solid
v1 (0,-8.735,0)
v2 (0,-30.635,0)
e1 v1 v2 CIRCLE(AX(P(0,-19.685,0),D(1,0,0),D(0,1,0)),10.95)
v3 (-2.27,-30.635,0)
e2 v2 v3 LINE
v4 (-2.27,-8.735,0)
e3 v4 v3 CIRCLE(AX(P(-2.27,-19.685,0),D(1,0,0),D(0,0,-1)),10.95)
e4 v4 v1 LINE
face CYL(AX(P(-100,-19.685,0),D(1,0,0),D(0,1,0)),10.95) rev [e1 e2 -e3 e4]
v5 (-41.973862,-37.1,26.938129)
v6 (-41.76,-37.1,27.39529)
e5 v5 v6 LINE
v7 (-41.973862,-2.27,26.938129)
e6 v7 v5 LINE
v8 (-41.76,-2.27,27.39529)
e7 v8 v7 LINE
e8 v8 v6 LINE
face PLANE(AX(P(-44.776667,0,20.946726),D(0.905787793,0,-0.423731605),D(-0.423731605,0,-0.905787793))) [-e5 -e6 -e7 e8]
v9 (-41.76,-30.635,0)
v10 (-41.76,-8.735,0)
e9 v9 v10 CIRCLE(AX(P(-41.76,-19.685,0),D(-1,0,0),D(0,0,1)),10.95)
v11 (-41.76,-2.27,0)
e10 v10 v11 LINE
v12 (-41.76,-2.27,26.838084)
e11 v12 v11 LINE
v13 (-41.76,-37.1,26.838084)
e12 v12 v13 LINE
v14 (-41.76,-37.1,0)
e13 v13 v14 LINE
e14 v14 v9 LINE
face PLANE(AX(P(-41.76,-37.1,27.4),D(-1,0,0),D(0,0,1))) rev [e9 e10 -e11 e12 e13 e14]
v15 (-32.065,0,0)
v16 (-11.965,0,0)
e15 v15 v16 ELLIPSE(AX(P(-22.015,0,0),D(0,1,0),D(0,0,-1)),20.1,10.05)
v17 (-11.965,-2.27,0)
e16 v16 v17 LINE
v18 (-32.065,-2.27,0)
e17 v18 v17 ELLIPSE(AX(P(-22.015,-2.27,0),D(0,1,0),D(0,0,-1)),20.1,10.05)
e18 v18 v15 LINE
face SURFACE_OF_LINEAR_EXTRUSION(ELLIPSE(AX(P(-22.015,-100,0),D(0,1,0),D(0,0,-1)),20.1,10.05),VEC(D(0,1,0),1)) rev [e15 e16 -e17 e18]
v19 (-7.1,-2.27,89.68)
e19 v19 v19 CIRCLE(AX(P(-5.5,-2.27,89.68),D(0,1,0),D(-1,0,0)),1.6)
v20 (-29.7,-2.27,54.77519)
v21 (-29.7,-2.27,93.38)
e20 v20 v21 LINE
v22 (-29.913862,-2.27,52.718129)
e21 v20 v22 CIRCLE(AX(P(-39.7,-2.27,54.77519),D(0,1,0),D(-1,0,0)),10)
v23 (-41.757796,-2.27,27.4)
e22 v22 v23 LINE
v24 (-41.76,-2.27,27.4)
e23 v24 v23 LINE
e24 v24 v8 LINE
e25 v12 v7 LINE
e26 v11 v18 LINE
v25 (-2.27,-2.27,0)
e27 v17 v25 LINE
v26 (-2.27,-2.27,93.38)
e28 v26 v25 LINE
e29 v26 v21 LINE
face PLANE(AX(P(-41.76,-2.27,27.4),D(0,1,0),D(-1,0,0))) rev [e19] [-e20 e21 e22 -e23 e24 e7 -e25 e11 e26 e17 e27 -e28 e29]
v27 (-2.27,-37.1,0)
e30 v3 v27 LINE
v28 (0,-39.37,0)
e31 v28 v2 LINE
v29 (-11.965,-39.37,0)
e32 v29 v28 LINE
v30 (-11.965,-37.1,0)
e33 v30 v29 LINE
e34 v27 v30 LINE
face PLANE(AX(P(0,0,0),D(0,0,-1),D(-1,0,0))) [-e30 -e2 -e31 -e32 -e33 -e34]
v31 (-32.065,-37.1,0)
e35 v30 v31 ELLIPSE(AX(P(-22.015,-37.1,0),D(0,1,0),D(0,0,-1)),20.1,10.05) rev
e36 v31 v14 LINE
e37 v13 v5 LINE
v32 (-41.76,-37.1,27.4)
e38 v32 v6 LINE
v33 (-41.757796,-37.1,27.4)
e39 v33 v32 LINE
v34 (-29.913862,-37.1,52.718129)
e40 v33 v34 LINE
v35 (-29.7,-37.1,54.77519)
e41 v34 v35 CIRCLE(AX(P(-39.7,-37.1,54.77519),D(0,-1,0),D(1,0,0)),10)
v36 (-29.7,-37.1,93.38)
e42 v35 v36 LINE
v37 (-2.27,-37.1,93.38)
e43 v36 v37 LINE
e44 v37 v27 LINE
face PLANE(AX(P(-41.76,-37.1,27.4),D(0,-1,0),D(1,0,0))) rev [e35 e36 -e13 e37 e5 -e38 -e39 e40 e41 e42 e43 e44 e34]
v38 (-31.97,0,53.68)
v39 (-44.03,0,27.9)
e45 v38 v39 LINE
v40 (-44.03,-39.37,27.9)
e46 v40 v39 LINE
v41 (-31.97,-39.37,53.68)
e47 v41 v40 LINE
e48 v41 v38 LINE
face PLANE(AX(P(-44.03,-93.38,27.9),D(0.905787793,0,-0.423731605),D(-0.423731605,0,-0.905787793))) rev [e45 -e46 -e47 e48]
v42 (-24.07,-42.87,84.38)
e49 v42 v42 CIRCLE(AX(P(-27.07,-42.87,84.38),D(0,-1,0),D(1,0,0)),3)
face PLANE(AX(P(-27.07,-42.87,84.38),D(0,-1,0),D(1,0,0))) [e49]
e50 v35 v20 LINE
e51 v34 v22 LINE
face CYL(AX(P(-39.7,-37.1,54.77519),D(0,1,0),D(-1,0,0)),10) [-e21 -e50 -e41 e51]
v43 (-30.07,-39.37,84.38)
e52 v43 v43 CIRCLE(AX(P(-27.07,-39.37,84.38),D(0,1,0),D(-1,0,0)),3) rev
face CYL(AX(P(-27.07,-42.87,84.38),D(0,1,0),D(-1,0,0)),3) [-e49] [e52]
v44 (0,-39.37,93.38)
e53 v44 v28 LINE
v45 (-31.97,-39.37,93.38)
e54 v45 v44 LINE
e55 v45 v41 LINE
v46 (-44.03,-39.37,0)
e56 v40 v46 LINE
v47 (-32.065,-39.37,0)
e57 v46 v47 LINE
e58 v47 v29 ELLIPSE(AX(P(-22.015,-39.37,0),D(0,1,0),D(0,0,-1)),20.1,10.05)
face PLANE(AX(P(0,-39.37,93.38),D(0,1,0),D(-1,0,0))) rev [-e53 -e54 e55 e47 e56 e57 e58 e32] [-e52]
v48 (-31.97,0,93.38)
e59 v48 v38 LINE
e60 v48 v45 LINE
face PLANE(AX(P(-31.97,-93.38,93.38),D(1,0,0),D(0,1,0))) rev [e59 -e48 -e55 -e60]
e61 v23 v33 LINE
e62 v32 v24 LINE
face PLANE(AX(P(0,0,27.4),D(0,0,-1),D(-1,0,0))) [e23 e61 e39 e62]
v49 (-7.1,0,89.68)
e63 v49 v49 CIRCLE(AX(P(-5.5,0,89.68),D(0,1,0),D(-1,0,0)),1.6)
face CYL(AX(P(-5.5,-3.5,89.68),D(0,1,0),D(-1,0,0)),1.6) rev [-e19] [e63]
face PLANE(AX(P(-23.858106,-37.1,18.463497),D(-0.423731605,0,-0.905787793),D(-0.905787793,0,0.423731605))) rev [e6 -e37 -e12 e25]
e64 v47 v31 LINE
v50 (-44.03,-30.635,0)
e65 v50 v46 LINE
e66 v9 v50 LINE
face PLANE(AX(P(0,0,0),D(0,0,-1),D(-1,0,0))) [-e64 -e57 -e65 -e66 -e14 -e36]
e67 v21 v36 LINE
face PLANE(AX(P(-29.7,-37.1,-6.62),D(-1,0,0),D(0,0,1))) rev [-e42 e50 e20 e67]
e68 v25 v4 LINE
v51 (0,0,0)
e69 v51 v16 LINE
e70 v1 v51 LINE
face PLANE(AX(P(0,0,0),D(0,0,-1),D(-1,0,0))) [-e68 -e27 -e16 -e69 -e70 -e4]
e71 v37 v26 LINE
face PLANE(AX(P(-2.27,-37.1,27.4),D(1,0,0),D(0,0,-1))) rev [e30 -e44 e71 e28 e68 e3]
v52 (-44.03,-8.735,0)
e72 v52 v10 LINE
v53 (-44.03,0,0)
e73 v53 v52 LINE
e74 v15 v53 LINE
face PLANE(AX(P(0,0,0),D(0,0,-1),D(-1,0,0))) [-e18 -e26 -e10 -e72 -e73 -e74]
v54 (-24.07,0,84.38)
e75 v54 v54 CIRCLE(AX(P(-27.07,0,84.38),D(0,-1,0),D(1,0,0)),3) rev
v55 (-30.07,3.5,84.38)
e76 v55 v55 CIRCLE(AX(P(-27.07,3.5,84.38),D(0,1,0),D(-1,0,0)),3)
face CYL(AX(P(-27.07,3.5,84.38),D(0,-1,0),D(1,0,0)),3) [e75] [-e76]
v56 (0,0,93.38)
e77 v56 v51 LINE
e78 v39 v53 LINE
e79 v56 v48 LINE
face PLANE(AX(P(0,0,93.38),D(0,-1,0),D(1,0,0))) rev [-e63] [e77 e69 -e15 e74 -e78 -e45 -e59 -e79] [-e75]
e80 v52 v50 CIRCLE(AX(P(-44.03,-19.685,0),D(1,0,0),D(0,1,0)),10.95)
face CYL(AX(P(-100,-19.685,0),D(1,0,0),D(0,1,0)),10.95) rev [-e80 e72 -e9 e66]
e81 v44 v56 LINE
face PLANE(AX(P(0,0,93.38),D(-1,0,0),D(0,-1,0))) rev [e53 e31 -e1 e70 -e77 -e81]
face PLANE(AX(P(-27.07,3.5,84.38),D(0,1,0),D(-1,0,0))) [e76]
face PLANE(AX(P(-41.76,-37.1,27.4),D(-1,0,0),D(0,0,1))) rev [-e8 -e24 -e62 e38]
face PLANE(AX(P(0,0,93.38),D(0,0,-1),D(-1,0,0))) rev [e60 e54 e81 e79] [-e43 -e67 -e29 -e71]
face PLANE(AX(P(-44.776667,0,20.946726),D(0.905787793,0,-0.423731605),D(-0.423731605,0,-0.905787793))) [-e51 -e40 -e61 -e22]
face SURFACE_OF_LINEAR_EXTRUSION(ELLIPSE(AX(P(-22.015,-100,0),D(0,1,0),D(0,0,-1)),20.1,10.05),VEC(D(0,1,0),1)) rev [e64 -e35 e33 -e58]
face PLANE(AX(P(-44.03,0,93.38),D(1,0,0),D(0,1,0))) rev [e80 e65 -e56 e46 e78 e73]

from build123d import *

# Parameters (mm, degrees)
ESQUISSE1_W                 = 44.03
ESQUISSE1_H                 = 39.37
BOSS_EXTRU_1_DEPTH          = 93.38
ESQUISSE2_W                 = 12.06
ESQUISSE2_H                 = 39.7
ENL_V_MAT_EXTRU_1_DEPTH     = 93.38
ENL_V_START                 = -68.526093067
ENL_V_MAT_EXTRU_2_OUTLINE_W = 39.37
ENL_V_MAT_EXTRU_2_OUTLINE_H = 28.461412473
ENL_V_MAT_EXTRU_2_DEPTH     = 16.822144735
ESQUISSE4_W                 = 39.49
ESQUISSE4_H                 = 34.83
ENL_V_MAT_EXTRU_3_DEPTH     = 27.4
ESQUISSE5_W                 = 27.43
ESQUISSE5_H                 = 34.83
ENL_V_MAT_EXTRU_4_DEPTH     = 100
ENL_V_START_2               = -2.27
ESQUISSE6_W                 = 28.461412473
ESQUISSE6_H                 = 34.83
ENL_V_MAT_EXTRU_7_DEPTH     = 20
CONG_2_R                    = 10
ESQUISSE7_R                 = 3
BOSS_EXTRU_2_DEPTH          = 3.5
BOSS_EXTRU_3_START          = 3.5
ESQUISSE8_R                 = 3
BOSS_EXTRU_3_DEPTH          = 3.5
ESQUISSE9_R                 = 1.6
ENL_V_MAT_EXTRU_8_DEPTH     = 3.5
ESQUISSE10_RX               = 20.1
ESQUISSE10_RY               = 10.05
ENL_V_MAT_EXTRU_9_DEPTH     = 100
ESQUISSE12_R                = 10.95
ENL_V_MAT_EXTRU_10_DEPTH    = 100


with BuildPart() as part:
    # Esquisse1 → Boss.-Extru.1 (new body)
    with BuildSketch(Plane.XY):
        with Locations((-22.015, -19.685)):
            Rectangle(ESQUISSE1_W, ESQUISSE1_H)
    extrude(amount=BOSS_EXTRU_1_DEPTH)

    # Esquisse2 → Enlèv. mat.-Extru.1 (cut)
    with BuildSketch(Plane(origin=(0, 0, 0), x_dir=(1, 0, 0), z_dir=(0, 1, 0))):
        with Locations((-38, -73.53)):
            Rectangle(ESQUISSE2_W, ESQUISSE2_H)
    extrude(amount=-ENL_V_MAT_EXTRU_1_DEPTH, mode=Mode.SUBTRACT)

    # Enlèv. mat.-Extru.2: read off the stored shape, not the designer's step
    # Enlèv. mat.-Extru.2 outline → Enlèv. mat.-Extru.2 (cut)
    with BuildSketch(Plane(origin=(0, 0, 0), x_dir=(0, 1, 0), z_dir=(0.905787793342715, 0, -0.423731605419439)).offset(ENL_V_START)):
        with Locations((-19.685, 20.845283085)):
            Rectangle(ENL_V_MAT_EXTRU_2_OUTLINE_W, ENL_V_MAT_EXTRU_2_OUTLINE_H)
    extrude(amount=ENL_V_MAT_EXTRU_2_DEPTH, mode=Mode.SUBTRACT)

    # Esquisse4 → Enlèv. mat.-Extru.3 (cut)
    with BuildSketch(Plane(origin=(0, 0, 0), x_dir=(-1, 0, 0), z_dir=(0, 0, -1))):
        with Locations((22.015, -19.685)):
            Rectangle(ESQUISSE4_W, ESQUISSE4_H)
    extrude(amount=-ENL_V_MAT_EXTRU_3_DEPTH, mode=Mode.SUBTRACT)

    # Esquisse5 → Enlèv. mat.-Extru.4 (cut)
    with BuildSketch(Plane.XY.offset(93.38)):
        with Locations((-15.985, -19.685)):
            Rectangle(ESQUISSE5_W, ESQUISSE5_H)
    extrude(amount=-ENL_V_MAT_EXTRU_4_DEPTH, mode=Mode.SUBTRACT)

    # Esquisse6 → Enlèv. mat.-Extru.7 (cut)
    with BuildSketch(Plane(origin=(-46.832805267, 0, 21.908597033), x_dir=(0.42373160541943916, 0, 0.9057877933427149), z_dir=(-0.9057877933427149, 0, 0.42373160541943916)).offset(ENL_V_START_2)):
        with Locations((20.845283085, -19.685)):
            Rectangle(ESQUISSE6_W, ESQUISSE6_H)
    extrude(amount=-ENL_V_MAT_EXTRU_7_DEPTH, mode=Mode.SUBTRACT)

    # Congé2
    # the kernel refuses this fillet: 10 mm, written as the material it takes off along each edge
    with BuildSketch(Plane(origin=(-29.7, -37.1, 52.618083786), x_dir=(0, 0, 1), z_dir=(0, 1, 0))) as cong_2_piece_1:
        with BuildLine():
            CenterArc((2.157105836, -10), CONG_2_R, 90, 11.870832878)
            Line((0.10004547, -0.213861709), (0, 0))
            Line((0, 0), (2.157105836, 0))
        make_face()
    extrude(amount=34.83, mode=Mode.SUBTRACT)

    # Esquisse7 → Boss.-Extru.2 (add)
    with BuildSketch(Plane(origin=(0, -39.37, 0), x_dir=(-1, 0, 0), z_dir=(0, -1, 0))):
        with Locations((27.07, -84.38)):
            Circle(ESQUISSE7_R)
    extrude(amount=BOSS_EXTRU_2_DEPTH)

    # Esquisse8 → Boss.-Extru.3 (add)
    with BuildSketch(Plane(origin=(0, 0, 0), x_dir=(1, 0, 0), z_dir=(0, 1, 0)).offset(BOSS_EXTRU_3_START)):
        with Locations(Location((-27.07, -84.38, 0), (0, 0, 180))):
            Circle(ESQUISSE8_R)
    extrude(amount=-BOSS_EXTRU_3_DEPTH)

    # Esquisse9 → Enlèv. mat.-Extru.8 (cut)
    with BuildSketch(Plane(origin=(0, 0, 0), x_dir=(1, 0, 0), z_dir=(0, 1, 0))):
        with Locations(Location((-5.5, -89.68, 0), (0, 0, 180))):
            Circle(ESQUISSE9_R)
    extrude(amount=-ENL_V_MAT_EXTRU_8_DEPTH, mode=Mode.SUBTRACT)

    # Esquisse10 → Enlèv. mat.-Extru.9 (cut)
    with BuildSketch(Plane(origin=(0, 0, 0), x_dir=(1, 0, 0), z_dir=(0, 1, 0))):
        with Locations(Location((-22.015, 0), (0, 0, -90))):
            Ellipse(ESQUISSE10_RX, ESQUISSE10_RY)
    extrude(amount=-ENL_V_MAT_EXTRU_9_DEPTH, mode=Mode.SUBTRACT)

    # Esquisse12 → Enlèv. mat.-Extru.10 (cut)
    with BuildSketch(Plane(origin=(0, 0, 0), x_dir=(0, 0, -1), z_dir=(1, 0, 0))):
        with Locations((0, -19.685)):
            Circle(ESQUISSE12_R)
    extrude(amount=-ENL_V_MAT_EXTRU_10_DEPTH, mode=Mode.SUBTRACT)


solid = part.part
